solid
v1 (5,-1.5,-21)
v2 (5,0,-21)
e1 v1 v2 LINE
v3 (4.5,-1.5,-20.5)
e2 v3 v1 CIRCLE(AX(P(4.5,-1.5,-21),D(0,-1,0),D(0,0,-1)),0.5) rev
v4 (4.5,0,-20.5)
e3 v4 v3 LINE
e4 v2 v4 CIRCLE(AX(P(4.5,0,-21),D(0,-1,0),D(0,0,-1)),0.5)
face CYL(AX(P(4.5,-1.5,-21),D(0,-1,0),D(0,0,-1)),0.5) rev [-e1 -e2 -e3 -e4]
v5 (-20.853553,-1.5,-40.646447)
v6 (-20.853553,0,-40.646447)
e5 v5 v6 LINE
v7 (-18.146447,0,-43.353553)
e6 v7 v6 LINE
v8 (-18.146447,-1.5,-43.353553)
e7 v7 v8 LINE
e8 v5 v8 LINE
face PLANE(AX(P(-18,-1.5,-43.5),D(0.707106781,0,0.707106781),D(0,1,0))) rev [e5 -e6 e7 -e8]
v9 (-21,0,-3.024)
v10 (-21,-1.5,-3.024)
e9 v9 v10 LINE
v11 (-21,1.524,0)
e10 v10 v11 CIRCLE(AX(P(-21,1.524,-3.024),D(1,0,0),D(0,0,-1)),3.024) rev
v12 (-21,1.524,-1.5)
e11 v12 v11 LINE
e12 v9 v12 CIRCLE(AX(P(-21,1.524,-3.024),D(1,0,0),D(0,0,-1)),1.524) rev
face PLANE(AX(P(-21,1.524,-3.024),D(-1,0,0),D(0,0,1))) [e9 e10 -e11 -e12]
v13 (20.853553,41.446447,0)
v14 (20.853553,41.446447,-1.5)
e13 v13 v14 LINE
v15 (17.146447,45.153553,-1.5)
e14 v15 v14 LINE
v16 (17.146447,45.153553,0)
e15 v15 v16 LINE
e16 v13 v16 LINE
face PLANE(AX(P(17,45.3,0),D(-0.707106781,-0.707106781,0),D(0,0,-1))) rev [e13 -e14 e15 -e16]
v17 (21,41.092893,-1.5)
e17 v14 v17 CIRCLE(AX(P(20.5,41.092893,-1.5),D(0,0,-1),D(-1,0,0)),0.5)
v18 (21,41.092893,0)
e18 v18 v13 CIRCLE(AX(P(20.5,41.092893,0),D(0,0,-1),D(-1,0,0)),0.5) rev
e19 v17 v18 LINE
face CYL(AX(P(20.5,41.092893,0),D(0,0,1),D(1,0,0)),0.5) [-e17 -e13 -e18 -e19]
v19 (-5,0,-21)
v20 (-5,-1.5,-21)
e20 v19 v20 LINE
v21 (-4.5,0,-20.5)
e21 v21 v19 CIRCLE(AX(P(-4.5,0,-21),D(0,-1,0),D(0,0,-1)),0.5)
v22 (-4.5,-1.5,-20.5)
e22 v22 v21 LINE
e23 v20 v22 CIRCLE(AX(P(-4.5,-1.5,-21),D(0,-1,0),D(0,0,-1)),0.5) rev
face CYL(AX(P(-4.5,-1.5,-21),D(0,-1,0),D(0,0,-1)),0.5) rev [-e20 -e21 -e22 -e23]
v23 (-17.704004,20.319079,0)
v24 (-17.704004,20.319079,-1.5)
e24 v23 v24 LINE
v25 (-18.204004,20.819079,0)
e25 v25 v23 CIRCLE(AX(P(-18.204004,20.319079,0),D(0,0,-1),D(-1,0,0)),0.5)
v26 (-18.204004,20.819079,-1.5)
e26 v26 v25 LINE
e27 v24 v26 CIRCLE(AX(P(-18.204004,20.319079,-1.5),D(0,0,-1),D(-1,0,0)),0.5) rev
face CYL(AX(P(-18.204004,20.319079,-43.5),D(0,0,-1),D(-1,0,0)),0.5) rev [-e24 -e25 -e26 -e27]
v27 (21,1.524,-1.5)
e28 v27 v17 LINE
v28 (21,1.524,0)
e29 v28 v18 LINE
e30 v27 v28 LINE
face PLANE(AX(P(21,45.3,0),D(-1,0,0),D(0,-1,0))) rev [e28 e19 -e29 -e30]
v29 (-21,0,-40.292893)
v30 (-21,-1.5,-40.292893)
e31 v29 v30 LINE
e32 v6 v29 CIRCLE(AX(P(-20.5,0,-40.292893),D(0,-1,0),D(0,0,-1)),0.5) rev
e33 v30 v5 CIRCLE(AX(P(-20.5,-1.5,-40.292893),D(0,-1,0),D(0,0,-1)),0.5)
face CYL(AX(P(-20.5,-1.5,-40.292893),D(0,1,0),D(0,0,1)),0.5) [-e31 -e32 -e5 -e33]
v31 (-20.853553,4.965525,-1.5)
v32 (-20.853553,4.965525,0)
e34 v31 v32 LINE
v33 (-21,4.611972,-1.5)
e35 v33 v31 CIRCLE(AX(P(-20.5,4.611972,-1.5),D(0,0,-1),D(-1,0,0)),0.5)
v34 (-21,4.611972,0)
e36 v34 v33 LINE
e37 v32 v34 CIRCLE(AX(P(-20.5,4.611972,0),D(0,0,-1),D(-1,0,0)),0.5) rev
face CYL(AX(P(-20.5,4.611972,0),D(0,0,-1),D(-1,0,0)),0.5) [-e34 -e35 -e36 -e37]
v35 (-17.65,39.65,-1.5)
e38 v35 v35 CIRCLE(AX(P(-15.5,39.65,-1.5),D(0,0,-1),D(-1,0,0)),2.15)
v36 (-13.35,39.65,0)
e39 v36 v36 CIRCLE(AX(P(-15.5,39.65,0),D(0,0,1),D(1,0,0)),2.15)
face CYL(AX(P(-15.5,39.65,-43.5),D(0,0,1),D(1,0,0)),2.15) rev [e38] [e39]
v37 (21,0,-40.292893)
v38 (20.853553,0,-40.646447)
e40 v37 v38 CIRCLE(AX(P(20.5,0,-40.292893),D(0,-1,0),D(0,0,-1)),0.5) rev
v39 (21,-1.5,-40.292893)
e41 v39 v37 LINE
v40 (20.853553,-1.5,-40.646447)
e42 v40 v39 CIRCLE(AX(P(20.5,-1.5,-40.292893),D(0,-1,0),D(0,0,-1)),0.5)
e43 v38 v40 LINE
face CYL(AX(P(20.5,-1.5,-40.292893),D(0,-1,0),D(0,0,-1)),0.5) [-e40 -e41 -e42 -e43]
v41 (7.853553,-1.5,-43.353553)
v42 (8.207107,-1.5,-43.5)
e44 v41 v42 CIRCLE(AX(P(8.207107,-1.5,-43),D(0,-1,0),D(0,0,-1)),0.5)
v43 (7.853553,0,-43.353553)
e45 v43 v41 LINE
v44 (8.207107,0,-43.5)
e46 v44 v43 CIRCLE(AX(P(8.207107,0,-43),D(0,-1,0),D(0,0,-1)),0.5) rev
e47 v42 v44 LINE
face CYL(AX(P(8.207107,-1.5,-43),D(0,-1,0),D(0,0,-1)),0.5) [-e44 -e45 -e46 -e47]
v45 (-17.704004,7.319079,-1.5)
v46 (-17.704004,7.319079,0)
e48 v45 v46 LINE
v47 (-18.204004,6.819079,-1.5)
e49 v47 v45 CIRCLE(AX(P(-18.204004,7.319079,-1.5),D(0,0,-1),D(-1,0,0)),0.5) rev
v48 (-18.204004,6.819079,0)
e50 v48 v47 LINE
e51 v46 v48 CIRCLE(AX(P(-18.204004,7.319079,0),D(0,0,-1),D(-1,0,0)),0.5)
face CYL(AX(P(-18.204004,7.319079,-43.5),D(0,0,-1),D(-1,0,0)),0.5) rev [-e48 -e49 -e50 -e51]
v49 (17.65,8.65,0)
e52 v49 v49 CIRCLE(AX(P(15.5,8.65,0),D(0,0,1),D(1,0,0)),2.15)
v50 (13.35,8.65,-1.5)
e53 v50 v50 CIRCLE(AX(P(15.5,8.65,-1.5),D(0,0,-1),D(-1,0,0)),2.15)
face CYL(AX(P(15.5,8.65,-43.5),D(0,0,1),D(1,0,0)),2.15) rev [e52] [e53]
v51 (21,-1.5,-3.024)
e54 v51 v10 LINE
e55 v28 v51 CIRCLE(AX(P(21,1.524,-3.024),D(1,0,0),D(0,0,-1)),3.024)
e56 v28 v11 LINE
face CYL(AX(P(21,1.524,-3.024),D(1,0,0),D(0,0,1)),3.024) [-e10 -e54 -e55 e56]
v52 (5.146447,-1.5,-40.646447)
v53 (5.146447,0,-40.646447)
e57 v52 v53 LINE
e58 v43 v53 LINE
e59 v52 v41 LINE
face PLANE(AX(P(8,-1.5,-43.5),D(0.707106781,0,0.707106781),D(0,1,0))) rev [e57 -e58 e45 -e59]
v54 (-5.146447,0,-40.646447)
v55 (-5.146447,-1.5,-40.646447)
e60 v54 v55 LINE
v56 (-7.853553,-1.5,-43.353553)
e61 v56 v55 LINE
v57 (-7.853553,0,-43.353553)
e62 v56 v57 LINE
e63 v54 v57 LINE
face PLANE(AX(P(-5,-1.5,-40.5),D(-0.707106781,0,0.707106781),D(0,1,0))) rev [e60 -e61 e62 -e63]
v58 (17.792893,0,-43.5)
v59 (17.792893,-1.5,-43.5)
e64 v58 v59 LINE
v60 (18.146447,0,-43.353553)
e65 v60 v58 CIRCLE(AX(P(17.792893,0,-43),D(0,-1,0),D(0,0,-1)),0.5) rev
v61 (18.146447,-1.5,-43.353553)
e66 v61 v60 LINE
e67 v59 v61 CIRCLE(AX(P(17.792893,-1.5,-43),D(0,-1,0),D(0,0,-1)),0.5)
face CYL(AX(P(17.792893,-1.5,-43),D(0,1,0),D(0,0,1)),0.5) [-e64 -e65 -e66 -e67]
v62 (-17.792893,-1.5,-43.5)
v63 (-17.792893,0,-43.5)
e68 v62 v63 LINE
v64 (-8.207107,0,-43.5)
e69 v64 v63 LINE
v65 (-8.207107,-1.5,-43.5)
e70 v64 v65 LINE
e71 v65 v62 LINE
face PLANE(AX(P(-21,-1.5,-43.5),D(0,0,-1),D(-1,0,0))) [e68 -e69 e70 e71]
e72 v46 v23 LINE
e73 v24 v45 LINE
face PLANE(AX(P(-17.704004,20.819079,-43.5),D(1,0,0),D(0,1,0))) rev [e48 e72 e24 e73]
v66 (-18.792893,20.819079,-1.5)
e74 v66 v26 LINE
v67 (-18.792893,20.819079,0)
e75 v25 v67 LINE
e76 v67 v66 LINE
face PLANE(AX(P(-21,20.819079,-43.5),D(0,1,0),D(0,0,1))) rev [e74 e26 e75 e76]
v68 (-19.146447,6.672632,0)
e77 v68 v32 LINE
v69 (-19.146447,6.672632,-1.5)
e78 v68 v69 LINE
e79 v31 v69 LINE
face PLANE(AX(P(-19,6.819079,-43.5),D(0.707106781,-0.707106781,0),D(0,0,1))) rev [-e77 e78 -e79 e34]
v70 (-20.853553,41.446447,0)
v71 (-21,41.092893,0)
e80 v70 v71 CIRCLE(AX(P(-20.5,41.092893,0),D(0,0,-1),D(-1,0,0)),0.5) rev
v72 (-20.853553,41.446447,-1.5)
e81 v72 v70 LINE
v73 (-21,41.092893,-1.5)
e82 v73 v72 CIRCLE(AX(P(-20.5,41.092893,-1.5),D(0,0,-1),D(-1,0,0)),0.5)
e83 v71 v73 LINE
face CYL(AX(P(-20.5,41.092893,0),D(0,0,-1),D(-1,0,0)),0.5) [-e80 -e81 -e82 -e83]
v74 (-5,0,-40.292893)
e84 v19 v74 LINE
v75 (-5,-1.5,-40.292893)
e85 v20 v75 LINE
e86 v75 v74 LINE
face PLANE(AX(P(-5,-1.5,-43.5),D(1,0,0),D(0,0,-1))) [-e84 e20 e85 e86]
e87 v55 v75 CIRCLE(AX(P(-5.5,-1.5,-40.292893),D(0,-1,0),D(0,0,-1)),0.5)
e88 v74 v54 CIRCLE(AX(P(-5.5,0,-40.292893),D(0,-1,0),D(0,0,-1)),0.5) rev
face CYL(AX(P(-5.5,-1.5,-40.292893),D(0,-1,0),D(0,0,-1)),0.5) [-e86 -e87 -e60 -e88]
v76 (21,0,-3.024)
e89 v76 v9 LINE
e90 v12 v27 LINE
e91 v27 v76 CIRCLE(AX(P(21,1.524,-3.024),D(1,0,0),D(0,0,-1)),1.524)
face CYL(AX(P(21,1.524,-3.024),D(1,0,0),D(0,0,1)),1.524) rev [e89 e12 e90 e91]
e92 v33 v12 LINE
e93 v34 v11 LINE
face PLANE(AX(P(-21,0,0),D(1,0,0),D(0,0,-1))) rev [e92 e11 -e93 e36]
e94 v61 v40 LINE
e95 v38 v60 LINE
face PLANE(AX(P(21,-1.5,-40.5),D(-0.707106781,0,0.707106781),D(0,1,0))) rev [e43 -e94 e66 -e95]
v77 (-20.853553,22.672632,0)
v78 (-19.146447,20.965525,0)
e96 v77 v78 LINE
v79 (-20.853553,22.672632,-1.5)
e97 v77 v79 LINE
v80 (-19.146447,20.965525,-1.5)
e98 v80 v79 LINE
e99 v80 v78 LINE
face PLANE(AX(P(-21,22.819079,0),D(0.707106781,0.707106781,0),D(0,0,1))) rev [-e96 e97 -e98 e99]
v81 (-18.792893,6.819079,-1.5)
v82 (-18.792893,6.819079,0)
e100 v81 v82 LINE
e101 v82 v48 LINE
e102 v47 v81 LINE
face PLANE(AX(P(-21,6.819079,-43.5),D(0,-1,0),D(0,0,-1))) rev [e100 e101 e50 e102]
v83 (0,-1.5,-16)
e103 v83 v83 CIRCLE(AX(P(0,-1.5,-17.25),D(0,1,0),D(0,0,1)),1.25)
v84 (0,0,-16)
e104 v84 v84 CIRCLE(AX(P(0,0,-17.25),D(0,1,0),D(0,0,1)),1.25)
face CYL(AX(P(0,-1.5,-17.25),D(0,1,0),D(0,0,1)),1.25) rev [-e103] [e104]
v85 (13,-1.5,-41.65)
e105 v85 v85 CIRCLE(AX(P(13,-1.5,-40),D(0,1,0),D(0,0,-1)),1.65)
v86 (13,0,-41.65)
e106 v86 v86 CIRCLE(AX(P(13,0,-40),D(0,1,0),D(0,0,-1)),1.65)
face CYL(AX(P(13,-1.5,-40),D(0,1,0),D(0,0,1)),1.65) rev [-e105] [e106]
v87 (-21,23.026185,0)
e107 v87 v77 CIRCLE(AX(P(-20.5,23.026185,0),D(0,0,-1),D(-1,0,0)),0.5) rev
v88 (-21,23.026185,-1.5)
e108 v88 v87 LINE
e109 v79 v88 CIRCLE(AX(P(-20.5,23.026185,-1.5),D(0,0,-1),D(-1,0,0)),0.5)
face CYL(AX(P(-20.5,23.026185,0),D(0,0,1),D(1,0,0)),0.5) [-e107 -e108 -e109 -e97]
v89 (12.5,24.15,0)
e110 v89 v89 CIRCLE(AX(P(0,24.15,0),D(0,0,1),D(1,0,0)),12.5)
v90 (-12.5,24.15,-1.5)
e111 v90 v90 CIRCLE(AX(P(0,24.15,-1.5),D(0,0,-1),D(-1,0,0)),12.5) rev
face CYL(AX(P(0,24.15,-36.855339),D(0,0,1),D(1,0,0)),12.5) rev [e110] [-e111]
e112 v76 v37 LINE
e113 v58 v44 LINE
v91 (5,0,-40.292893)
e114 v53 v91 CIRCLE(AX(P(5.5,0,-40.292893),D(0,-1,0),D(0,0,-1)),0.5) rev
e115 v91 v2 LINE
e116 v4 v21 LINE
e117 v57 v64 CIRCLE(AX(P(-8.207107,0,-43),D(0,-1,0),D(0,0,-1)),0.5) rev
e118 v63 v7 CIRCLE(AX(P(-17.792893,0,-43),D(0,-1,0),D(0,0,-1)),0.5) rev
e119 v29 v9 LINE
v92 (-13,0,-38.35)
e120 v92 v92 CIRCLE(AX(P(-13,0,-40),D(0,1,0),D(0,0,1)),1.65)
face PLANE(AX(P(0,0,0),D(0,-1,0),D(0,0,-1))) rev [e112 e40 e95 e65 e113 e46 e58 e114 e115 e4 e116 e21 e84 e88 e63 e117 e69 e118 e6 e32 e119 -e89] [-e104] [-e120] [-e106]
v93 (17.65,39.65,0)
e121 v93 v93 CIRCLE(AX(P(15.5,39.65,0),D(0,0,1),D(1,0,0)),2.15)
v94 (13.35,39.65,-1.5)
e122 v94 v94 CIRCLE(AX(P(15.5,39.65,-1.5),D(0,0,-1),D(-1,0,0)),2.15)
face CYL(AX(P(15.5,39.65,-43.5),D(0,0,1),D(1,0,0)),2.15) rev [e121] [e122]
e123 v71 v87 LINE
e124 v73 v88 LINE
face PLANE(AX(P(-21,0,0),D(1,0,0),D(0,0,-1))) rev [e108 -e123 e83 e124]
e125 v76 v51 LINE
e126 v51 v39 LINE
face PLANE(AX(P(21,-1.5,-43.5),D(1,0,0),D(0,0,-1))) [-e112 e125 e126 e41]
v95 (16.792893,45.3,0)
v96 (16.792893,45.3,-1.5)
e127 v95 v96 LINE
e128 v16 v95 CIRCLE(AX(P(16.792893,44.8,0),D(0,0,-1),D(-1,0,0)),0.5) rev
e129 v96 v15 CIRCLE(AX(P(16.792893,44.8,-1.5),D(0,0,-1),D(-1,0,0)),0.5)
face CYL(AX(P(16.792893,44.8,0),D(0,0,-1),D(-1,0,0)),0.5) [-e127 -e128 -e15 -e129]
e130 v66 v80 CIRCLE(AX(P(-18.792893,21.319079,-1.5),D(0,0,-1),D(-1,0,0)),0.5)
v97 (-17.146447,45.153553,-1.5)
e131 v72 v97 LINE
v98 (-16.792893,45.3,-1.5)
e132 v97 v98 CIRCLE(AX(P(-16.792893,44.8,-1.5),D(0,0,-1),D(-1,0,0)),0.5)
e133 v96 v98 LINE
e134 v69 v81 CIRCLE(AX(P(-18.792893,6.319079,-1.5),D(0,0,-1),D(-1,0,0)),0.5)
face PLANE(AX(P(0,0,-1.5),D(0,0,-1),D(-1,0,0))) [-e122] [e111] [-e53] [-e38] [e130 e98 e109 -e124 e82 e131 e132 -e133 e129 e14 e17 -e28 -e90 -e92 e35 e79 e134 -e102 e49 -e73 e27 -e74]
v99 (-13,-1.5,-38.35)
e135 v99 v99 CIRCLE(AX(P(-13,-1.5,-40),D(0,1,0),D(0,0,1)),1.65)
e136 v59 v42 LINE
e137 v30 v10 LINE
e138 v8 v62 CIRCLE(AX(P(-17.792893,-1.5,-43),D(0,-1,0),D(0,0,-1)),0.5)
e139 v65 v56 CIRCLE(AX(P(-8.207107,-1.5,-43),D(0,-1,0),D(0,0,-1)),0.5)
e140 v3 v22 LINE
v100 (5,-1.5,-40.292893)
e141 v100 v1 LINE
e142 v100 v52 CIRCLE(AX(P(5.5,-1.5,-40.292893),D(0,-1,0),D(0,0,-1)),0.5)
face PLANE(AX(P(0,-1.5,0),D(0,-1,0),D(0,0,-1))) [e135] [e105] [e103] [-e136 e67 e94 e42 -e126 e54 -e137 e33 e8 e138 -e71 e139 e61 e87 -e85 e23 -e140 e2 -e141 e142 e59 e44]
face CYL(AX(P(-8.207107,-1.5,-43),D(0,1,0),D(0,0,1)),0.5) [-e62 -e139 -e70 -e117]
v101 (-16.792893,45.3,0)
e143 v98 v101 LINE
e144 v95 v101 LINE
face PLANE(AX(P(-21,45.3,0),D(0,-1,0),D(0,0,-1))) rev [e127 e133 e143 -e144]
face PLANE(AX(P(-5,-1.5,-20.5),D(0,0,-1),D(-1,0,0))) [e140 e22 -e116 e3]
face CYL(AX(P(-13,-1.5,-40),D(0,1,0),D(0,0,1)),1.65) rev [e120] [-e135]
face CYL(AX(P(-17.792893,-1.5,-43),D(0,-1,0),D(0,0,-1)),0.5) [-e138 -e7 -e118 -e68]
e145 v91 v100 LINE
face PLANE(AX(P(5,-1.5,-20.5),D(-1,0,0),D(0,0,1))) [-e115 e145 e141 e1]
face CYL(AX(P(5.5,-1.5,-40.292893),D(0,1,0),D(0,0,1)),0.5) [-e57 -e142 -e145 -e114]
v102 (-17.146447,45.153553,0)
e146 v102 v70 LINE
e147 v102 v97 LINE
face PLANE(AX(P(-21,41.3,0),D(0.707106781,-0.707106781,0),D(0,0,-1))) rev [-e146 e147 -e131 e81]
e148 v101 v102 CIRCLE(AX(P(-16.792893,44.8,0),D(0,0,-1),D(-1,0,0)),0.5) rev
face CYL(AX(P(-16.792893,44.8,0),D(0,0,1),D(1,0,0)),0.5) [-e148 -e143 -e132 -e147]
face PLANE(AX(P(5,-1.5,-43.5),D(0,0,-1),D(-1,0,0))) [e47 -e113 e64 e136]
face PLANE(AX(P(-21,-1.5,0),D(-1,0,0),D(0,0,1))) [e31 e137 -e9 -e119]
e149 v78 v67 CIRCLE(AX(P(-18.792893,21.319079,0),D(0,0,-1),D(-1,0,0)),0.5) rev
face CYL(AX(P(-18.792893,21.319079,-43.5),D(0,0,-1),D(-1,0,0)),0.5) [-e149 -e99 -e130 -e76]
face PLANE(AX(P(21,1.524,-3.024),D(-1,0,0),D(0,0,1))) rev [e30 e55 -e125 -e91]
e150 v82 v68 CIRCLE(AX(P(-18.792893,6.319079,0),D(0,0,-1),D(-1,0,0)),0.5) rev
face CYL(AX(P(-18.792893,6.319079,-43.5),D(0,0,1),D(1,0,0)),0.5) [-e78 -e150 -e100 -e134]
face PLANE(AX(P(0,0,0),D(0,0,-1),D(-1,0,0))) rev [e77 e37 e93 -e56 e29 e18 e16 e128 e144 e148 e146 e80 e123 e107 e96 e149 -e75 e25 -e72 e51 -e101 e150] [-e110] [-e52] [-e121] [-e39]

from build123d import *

# Parameters (mm, degrees)
BASE_FLANGE1_DEPTH           = 1.5
EDGE_FLANGE1_STRIP_W         = 9.048
EDGE_FLANGE1_STRIP_H         = 1.5
EDGE_FLANGE1_STRIP_CUT_DEPTH = 42
EDGE_FLANGE1_DEPTH           = 42
SKETCH9_R                    = 12.5
CUT_EXTRUDE1_DEPTH           = 1.5
SKETCH10_R                   = 2.15
CUT_EXTRUDE2_DEPTH           = 67.221899701
SKETCH11_R                   = 1.65
CUT_EXTRUDE3_DEPTH           = 67.221899701
CHAMFER1_SIZE                = 4
CHAMFER2_SIZE                = 3
SKETCH12_W                   = 3.295995972
SKETCH12_H                   = 14
CUT_EXTRUDE4_DEPTH           = 67.221899701
CHAMFER3_SIZE                = 2
SKETCH13_R                   = 1.25
CUT_EXTRUDE5_DEPTH           = 67.221899701
FILLET1_R                    = 0.5


# Sheet-metal steps are written as plain solids
with BuildPart() as part:
    # Sketch1 → Base-Flange1 (new body)
    with BuildSketch(Plane(origin=(0, 0, 0), x_dir=(1, 0, 0), z_dir=(0, 1, 0))):
        Polygon((-21, 43.5), (-5, 43.5), (-5, 20.5), (5, 20.5), (5, 43.5), (21, 43.5), (21, 0), (-21, 0), align=None)
    extrude(amount=-BASE_FLANGE1_DEPTH)

    # Edge-Flange1 strip (across the edge) → Edge-Flange1 strip cut (cut)
    with BuildSketch(Plane(origin=(-21, 0, 0), x_dir=(0, 0, -1), z_dir=(1, 0, 0))):
        with Locations((-1.5, -0.75)):
            Rectangle(EDGE_FLANGE1_STRIP_W, EDGE_FLANGE1_STRIP_H)
    extrude(amount=EDGE_FLANGE1_STRIP_CUT_DEPTH, mode=Mode.SUBTRACT)

    # Edge-Flange1 section (across the edge) → Edge-Flange1 (add)
    with BuildSketch(Plane(origin=(-21, 0, 0), x_dir=(0, 0, -1), z_dir=(1, 0, 0))):
        with BuildLine():
            Line((0, 1.524), (0, 45.3))
            Line((0, 45.3), (1.5, 45.3))
            Line((1.5, 45.3), (1.5, 1.524))
            ThreePointArc((1.5, 1.524), (1.946369265, 0.446369265), (3.024, 0))
            Line((3.024, 0), (3.024, -1.5))
            ThreePointArc((3.024, -1.5), (0.885709094, -0.614290906), (0, 1.524))
        make_face()
    extrude(amount=EDGE_FLANGE1_DEPTH)

    # Sketch9 → Cut-Extrude1 (cut)
    with BuildSketch(Plane.XY):
        with Locations((0, 24.15)):
            Circle(SKETCH9_R)
    extrude(amount=-CUT_EXTRUDE1_DEPTH, mode=Mode.SUBTRACT)

    # Sketch10 → Cut-Extrude2 (cut, through all)
    with BuildSketch(Plane.XY):
        with Locations((-15.5, 39.65)):
            Circle(SKETCH10_R)
        with Locations((15.5, 39.65)):
            Circle(SKETCH10_R)
        with Locations((15.5, 8.65)):
            Circle(SKETCH10_R)
    extrude(amount=-CUT_EXTRUDE2_DEPTH, mode=Mode.SUBTRACT)

    # Sketch11 → Cut-Extrude3 (cut, through all)
    with BuildSketch(Plane(origin=(0, 0, 0), x_dir=(1, 0, 0), z_dir=(0, 1, 0))):
        with Locations(Location((-13, 40, 0), (0, 0, 270))):
            Circle(SKETCH11_R)
        with Locations(Location((13, 40, 0), (0, 0, 90))):
            Circle(SKETCH11_R)
    extrude(amount=-CUT_EXTRUDE3_DEPTH, mode=Mode.SUBTRACT)

    # Chamfer1
    chamfer1_edges = [part.edges().sort_by_distance(p)[0] for p in [
        (-21, 45.3, -0.75),
        (21, 45.3, -0.75),
    ]]
    chamfer(chamfer1_edges, length=CHAMFER1_SIZE)

    # Chamfer2
    chamfer2_edges = [part.edges().sort_by_distance(p)[0] for p in [
        (-21, -0.75, -43.5),
        (-5, -0.75, -43.5),
        (5, -0.75, -43.5),
        (21, -0.75, -43.5),
    ]]
    chamfer(chamfer2_edges, length=CHAMFER2_SIZE)

    # Sketch12 → Cut-Extrude4 (cut, through all)
    with BuildSketch(Plane.XY):
        with Locations((-19.352002014, 13.819078659)):
            Rectangle(SKETCH12_W, SKETCH12_H)
    extrude(amount=-CUT_EXTRUDE4_DEPTH, mode=Mode.SUBTRACT)

    # Chamfer3
    chamfer3_edges = [part.edges().sort_by_distance(p)[0] for p in [
        (-21, 6.819078659, -0.75),
        (-21, 20.819078659, -0.75),
    ]]
    chamfer(chamfer3_edges, length=CHAMFER3_SIZE)

    # Sketch13 → Cut-Extrude5 (cut, through all)
    with BuildSketch(Plane(origin=(0, 0, 0), x_dir=(1, 0, 0), z_dir=(0, 1, 0))):
        with Locations(Location((0, 17.25, 0), (0, 0, 270))):
            Circle(SKETCH13_R)
    extrude(amount=-CUT_EXTRUDE5_DEPTH, mode=Mode.SUBTRACT)

    # Fillet1
    fillet1_edges = [part.edges().sort_by_distance(p)[0] for p in [
        (21, 41.3, -0.75),
        (-8, -0.75, -43.5),
        (-18, -0.75, -43.5),
        (-21, -0.75, -40.5),
        (21, -0.75, -40.5),
        (8, -0.75, -43.5),
        (18, -0.75, -43.5),
        (-5, -0.75, -40.5),
        (5, -0.75, -40.5),
        (-5, -0.75, -20.5),
        (5, -0.75, -20.5),
        (-17.704004028, 20.819078659, -0.75),
        (-17.704004028, 6.819078659, -0.75),
        (-19, 6.819078659, -0.75),
        (-21, 4.819078659, -0.75),
        (-21, 22.819078659, -0.75),
        (-19, 20.819078659, -0.75),
        (-21, 41.3, -0.75),
        (17, 45.3, -0.75),
        (-17, 45.3, -0.75),
    ]]
    fillet(fillet1_edges, radius=FILLET1_R)


solid = part.part
